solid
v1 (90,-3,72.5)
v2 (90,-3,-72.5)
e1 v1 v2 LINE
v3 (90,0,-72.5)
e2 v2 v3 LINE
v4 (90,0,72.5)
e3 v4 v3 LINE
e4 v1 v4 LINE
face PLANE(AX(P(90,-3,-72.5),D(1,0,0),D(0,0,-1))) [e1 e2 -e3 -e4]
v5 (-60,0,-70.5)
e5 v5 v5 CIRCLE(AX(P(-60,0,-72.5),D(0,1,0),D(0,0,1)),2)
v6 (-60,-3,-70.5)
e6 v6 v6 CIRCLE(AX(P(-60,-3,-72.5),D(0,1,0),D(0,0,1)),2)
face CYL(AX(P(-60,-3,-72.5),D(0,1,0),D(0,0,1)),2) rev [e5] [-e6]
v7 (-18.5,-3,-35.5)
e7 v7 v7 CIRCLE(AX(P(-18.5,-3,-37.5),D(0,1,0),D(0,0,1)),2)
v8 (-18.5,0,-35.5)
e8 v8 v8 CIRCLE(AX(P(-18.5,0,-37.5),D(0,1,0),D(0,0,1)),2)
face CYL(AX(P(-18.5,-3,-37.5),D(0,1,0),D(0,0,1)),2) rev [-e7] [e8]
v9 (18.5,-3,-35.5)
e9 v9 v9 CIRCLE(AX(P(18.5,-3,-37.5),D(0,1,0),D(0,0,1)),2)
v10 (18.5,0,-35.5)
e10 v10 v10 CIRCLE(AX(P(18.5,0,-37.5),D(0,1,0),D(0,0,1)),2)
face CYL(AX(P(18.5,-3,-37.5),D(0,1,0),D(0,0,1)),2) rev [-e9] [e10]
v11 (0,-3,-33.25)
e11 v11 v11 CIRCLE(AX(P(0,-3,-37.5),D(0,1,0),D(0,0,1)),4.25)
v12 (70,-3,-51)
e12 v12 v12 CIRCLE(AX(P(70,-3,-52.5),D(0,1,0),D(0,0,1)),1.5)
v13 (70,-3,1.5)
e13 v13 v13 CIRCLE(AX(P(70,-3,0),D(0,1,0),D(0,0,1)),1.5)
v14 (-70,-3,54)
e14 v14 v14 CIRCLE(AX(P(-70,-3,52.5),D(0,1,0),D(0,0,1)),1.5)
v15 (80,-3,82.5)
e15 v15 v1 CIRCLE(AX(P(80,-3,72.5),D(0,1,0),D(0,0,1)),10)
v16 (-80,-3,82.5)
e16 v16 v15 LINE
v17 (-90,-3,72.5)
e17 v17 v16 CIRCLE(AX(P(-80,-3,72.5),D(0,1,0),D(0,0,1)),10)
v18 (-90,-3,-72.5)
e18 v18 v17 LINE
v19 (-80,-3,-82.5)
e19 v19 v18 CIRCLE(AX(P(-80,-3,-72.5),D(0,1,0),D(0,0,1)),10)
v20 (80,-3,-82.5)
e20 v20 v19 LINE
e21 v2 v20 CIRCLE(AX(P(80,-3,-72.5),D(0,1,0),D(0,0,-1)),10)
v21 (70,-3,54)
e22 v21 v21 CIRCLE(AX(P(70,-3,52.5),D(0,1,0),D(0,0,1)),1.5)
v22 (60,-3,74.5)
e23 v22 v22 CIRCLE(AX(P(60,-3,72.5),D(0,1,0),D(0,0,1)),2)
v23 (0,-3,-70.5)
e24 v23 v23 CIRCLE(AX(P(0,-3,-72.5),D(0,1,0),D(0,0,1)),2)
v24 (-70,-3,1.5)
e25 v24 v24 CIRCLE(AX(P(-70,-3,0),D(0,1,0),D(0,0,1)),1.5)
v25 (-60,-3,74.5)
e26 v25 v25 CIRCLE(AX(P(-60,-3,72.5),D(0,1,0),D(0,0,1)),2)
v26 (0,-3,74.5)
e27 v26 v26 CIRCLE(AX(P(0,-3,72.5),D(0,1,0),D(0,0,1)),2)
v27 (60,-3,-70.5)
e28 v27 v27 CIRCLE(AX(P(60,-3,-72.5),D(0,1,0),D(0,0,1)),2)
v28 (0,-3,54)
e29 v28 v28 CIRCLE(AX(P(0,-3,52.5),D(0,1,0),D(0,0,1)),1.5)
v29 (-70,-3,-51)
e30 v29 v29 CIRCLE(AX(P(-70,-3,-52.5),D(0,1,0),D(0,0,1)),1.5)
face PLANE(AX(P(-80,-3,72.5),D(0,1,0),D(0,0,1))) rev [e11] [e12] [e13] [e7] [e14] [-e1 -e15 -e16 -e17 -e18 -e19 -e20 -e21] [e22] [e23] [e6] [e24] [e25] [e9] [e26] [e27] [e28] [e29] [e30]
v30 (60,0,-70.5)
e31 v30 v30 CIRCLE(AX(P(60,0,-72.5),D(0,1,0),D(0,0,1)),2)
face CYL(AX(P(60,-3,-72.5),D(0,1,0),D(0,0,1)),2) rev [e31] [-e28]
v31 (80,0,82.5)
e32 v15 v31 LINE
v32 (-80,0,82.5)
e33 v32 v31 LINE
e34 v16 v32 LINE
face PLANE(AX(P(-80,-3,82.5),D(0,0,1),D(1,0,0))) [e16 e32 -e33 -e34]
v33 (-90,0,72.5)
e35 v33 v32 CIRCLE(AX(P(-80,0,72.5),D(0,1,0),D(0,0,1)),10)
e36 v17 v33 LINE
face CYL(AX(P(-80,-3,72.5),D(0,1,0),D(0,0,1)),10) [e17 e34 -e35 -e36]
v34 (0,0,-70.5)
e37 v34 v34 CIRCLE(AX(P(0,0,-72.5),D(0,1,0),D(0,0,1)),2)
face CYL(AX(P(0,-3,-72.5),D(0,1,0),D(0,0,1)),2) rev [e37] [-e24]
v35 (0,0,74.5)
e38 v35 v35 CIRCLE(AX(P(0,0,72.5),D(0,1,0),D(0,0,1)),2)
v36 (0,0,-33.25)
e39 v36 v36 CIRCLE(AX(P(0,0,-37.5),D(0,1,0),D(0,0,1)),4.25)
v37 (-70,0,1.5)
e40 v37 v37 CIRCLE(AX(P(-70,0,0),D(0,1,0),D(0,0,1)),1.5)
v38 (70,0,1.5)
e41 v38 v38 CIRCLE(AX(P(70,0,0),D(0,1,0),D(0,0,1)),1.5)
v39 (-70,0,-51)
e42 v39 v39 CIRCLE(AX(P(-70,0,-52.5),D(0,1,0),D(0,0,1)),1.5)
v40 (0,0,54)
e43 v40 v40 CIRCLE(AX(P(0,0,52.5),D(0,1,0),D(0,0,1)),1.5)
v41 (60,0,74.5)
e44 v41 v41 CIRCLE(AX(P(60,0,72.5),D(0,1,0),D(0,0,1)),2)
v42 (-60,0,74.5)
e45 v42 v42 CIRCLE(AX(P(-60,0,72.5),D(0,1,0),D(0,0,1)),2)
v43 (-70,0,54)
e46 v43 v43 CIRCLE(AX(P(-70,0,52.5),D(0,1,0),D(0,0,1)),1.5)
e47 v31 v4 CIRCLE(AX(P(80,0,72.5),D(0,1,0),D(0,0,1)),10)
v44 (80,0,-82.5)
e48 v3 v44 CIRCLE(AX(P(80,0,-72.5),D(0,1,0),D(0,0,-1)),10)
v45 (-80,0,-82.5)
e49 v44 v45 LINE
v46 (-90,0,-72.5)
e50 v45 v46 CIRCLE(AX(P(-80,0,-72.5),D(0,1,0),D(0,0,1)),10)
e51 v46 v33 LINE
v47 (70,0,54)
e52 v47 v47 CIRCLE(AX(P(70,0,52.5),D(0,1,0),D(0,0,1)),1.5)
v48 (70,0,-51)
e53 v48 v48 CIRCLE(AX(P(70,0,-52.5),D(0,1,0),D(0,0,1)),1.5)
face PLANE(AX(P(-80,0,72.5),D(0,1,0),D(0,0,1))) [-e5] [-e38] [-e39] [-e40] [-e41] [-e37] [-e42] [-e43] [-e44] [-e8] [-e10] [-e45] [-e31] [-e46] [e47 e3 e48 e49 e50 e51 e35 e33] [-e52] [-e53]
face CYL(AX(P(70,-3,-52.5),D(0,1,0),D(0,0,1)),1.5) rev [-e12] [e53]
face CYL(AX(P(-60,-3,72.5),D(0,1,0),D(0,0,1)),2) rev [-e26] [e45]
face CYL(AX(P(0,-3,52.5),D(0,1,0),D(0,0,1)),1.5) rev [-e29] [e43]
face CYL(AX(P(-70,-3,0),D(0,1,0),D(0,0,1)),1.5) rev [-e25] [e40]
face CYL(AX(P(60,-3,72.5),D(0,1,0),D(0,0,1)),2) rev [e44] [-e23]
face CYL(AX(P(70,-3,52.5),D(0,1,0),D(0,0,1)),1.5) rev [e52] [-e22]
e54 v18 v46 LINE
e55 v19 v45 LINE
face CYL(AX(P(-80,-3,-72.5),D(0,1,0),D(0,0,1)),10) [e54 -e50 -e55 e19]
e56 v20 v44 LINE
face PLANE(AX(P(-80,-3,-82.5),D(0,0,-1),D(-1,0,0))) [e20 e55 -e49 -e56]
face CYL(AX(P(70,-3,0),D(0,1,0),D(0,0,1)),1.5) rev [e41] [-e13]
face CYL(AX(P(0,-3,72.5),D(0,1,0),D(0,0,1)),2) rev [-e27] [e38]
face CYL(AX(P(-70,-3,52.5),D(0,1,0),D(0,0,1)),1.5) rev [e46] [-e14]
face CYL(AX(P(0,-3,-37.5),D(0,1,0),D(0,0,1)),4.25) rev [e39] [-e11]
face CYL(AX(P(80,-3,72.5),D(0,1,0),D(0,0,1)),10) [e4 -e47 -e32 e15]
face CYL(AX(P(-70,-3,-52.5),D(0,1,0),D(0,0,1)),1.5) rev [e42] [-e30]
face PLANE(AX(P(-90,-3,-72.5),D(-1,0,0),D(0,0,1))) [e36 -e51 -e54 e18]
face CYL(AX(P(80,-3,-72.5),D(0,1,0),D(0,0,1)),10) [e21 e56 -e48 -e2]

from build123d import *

# Parameters (mm, degrees)
SKETCH_1_R             = 2
SKETCH_1_R_2           = 4.25
SKETCH_1_R_3           = 1.5
SM_BASE_FLANGE_1_DEPTH = 3


# Sheet-metal steps are written as plain solids
with BuildPart() as part:
    # Sketch 1 → 基体-法兰1 (new body)
    with BuildSketch(Plane(origin=(0, 0, 0), x_dir=(1, 0, 0), z_dir=(0, 1, 0))):
        with BuildLine():
            Line((-80, 82.5), (80, 82.5))
            ThreePointArc((80, 82.5), (87.071067812, 79.571067812), (90, 72.5))
            Line((90, 72.5), (90, -72.5))
            ThreePointArc((90, -72.5), (87.071067812, -79.571067812), (80, -82.5))
            Line((80, -82.5), (-80, -82.5))
            ThreePointArc((-80, -82.5), (-87.071067812, -79.571067812), (-90, -72.5))
            Line((-90, -72.5), (-90, 72.5))
            ThreePointArc((-90, 72.5), (-87.071067812, 79.571067812), (-80, 82.5))
        make_face()
        with Locations(Location((0, 72.5, 0), (0, 0, 270))):
            Circle(SKETCH_1_R, mode=Mode.SUBTRACT)
        with Locations(Location((60, 72.5, 0), (0, 0, 270))):
            Circle(SKETCH_1_R, mode=Mode.SUBTRACT)
        with Locations(Location((-60, 72.5, 0), (0, 0, 270))):
            Circle(SKETCH_1_R, mode=Mode.SUBTRACT)
        with Locations(Location((0, -72.5, 0), (0, 0, 270))):
            Circle(SKETCH_1_R, mode=Mode.SUBTRACT)
        with Locations(Location((-60, -72.5, 0), (0, 0, 270))):
            Circle(SKETCH_1_R, mode=Mode.SUBTRACT)
        with Locations(Location((60, -72.5, 0), (0, 0, 270))):
            Circle(SKETCH_1_R, mode=Mode.SUBTRACT)
        with Locations(Location((0, 37.5, 0), (0, 0, 270))):
            Circle(SKETCH_1_R_2, mode=Mode.SUBTRACT)
        with Locations(Location((18.5, 37.5, 0), (0, 0, 270))):
            Circle(SKETCH_1_R, mode=Mode.SUBTRACT)
        with Locations(Location((-18.5, 37.5, 0), (0, 0, 270))):
            Circle(SKETCH_1_R, mode=Mode.SUBTRACT)
        with Locations(Location((70, 52.5, 0), (0, 0, 270))):
            Circle(SKETCH_1_R_3, mode=Mode.SUBTRACT)
        with Locations(Location((70, 0, 0), (0, 0, 270))):
            Circle(SKETCH_1_R_3, mode=Mode.SUBTRACT)
        with Locations(Location((70, -52.5, 0), (0, 0, 270))):
            Circle(SKETCH_1_R_3, mode=Mode.SUBTRACT)
        with Locations(Location((-70, 52.5, 0), (0, 0, 270))):
            Circle(SKETCH_1_R_3, mode=Mode.SUBTRACT)
        with Locations(Location((-70, 0, 0), (0, 0, 270))):
            Circle(SKETCH_1_R_3, mode=Mode.SUBTRACT)
        with Locations(Location((-70, -52.5, 0), (0, 0, 270))):
            Circle(SKETCH_1_R_3, mode=Mode.SUBTRACT)
        with Locations(Location((0, -52.5, 0), (0, 0, 270))):
            Circle(SKETCH_1_R_3, mode=Mode.SUBTRACT)
    extrude(amount=-SM_BASE_FLANGE_1_DEPTH)


solid = part.part
